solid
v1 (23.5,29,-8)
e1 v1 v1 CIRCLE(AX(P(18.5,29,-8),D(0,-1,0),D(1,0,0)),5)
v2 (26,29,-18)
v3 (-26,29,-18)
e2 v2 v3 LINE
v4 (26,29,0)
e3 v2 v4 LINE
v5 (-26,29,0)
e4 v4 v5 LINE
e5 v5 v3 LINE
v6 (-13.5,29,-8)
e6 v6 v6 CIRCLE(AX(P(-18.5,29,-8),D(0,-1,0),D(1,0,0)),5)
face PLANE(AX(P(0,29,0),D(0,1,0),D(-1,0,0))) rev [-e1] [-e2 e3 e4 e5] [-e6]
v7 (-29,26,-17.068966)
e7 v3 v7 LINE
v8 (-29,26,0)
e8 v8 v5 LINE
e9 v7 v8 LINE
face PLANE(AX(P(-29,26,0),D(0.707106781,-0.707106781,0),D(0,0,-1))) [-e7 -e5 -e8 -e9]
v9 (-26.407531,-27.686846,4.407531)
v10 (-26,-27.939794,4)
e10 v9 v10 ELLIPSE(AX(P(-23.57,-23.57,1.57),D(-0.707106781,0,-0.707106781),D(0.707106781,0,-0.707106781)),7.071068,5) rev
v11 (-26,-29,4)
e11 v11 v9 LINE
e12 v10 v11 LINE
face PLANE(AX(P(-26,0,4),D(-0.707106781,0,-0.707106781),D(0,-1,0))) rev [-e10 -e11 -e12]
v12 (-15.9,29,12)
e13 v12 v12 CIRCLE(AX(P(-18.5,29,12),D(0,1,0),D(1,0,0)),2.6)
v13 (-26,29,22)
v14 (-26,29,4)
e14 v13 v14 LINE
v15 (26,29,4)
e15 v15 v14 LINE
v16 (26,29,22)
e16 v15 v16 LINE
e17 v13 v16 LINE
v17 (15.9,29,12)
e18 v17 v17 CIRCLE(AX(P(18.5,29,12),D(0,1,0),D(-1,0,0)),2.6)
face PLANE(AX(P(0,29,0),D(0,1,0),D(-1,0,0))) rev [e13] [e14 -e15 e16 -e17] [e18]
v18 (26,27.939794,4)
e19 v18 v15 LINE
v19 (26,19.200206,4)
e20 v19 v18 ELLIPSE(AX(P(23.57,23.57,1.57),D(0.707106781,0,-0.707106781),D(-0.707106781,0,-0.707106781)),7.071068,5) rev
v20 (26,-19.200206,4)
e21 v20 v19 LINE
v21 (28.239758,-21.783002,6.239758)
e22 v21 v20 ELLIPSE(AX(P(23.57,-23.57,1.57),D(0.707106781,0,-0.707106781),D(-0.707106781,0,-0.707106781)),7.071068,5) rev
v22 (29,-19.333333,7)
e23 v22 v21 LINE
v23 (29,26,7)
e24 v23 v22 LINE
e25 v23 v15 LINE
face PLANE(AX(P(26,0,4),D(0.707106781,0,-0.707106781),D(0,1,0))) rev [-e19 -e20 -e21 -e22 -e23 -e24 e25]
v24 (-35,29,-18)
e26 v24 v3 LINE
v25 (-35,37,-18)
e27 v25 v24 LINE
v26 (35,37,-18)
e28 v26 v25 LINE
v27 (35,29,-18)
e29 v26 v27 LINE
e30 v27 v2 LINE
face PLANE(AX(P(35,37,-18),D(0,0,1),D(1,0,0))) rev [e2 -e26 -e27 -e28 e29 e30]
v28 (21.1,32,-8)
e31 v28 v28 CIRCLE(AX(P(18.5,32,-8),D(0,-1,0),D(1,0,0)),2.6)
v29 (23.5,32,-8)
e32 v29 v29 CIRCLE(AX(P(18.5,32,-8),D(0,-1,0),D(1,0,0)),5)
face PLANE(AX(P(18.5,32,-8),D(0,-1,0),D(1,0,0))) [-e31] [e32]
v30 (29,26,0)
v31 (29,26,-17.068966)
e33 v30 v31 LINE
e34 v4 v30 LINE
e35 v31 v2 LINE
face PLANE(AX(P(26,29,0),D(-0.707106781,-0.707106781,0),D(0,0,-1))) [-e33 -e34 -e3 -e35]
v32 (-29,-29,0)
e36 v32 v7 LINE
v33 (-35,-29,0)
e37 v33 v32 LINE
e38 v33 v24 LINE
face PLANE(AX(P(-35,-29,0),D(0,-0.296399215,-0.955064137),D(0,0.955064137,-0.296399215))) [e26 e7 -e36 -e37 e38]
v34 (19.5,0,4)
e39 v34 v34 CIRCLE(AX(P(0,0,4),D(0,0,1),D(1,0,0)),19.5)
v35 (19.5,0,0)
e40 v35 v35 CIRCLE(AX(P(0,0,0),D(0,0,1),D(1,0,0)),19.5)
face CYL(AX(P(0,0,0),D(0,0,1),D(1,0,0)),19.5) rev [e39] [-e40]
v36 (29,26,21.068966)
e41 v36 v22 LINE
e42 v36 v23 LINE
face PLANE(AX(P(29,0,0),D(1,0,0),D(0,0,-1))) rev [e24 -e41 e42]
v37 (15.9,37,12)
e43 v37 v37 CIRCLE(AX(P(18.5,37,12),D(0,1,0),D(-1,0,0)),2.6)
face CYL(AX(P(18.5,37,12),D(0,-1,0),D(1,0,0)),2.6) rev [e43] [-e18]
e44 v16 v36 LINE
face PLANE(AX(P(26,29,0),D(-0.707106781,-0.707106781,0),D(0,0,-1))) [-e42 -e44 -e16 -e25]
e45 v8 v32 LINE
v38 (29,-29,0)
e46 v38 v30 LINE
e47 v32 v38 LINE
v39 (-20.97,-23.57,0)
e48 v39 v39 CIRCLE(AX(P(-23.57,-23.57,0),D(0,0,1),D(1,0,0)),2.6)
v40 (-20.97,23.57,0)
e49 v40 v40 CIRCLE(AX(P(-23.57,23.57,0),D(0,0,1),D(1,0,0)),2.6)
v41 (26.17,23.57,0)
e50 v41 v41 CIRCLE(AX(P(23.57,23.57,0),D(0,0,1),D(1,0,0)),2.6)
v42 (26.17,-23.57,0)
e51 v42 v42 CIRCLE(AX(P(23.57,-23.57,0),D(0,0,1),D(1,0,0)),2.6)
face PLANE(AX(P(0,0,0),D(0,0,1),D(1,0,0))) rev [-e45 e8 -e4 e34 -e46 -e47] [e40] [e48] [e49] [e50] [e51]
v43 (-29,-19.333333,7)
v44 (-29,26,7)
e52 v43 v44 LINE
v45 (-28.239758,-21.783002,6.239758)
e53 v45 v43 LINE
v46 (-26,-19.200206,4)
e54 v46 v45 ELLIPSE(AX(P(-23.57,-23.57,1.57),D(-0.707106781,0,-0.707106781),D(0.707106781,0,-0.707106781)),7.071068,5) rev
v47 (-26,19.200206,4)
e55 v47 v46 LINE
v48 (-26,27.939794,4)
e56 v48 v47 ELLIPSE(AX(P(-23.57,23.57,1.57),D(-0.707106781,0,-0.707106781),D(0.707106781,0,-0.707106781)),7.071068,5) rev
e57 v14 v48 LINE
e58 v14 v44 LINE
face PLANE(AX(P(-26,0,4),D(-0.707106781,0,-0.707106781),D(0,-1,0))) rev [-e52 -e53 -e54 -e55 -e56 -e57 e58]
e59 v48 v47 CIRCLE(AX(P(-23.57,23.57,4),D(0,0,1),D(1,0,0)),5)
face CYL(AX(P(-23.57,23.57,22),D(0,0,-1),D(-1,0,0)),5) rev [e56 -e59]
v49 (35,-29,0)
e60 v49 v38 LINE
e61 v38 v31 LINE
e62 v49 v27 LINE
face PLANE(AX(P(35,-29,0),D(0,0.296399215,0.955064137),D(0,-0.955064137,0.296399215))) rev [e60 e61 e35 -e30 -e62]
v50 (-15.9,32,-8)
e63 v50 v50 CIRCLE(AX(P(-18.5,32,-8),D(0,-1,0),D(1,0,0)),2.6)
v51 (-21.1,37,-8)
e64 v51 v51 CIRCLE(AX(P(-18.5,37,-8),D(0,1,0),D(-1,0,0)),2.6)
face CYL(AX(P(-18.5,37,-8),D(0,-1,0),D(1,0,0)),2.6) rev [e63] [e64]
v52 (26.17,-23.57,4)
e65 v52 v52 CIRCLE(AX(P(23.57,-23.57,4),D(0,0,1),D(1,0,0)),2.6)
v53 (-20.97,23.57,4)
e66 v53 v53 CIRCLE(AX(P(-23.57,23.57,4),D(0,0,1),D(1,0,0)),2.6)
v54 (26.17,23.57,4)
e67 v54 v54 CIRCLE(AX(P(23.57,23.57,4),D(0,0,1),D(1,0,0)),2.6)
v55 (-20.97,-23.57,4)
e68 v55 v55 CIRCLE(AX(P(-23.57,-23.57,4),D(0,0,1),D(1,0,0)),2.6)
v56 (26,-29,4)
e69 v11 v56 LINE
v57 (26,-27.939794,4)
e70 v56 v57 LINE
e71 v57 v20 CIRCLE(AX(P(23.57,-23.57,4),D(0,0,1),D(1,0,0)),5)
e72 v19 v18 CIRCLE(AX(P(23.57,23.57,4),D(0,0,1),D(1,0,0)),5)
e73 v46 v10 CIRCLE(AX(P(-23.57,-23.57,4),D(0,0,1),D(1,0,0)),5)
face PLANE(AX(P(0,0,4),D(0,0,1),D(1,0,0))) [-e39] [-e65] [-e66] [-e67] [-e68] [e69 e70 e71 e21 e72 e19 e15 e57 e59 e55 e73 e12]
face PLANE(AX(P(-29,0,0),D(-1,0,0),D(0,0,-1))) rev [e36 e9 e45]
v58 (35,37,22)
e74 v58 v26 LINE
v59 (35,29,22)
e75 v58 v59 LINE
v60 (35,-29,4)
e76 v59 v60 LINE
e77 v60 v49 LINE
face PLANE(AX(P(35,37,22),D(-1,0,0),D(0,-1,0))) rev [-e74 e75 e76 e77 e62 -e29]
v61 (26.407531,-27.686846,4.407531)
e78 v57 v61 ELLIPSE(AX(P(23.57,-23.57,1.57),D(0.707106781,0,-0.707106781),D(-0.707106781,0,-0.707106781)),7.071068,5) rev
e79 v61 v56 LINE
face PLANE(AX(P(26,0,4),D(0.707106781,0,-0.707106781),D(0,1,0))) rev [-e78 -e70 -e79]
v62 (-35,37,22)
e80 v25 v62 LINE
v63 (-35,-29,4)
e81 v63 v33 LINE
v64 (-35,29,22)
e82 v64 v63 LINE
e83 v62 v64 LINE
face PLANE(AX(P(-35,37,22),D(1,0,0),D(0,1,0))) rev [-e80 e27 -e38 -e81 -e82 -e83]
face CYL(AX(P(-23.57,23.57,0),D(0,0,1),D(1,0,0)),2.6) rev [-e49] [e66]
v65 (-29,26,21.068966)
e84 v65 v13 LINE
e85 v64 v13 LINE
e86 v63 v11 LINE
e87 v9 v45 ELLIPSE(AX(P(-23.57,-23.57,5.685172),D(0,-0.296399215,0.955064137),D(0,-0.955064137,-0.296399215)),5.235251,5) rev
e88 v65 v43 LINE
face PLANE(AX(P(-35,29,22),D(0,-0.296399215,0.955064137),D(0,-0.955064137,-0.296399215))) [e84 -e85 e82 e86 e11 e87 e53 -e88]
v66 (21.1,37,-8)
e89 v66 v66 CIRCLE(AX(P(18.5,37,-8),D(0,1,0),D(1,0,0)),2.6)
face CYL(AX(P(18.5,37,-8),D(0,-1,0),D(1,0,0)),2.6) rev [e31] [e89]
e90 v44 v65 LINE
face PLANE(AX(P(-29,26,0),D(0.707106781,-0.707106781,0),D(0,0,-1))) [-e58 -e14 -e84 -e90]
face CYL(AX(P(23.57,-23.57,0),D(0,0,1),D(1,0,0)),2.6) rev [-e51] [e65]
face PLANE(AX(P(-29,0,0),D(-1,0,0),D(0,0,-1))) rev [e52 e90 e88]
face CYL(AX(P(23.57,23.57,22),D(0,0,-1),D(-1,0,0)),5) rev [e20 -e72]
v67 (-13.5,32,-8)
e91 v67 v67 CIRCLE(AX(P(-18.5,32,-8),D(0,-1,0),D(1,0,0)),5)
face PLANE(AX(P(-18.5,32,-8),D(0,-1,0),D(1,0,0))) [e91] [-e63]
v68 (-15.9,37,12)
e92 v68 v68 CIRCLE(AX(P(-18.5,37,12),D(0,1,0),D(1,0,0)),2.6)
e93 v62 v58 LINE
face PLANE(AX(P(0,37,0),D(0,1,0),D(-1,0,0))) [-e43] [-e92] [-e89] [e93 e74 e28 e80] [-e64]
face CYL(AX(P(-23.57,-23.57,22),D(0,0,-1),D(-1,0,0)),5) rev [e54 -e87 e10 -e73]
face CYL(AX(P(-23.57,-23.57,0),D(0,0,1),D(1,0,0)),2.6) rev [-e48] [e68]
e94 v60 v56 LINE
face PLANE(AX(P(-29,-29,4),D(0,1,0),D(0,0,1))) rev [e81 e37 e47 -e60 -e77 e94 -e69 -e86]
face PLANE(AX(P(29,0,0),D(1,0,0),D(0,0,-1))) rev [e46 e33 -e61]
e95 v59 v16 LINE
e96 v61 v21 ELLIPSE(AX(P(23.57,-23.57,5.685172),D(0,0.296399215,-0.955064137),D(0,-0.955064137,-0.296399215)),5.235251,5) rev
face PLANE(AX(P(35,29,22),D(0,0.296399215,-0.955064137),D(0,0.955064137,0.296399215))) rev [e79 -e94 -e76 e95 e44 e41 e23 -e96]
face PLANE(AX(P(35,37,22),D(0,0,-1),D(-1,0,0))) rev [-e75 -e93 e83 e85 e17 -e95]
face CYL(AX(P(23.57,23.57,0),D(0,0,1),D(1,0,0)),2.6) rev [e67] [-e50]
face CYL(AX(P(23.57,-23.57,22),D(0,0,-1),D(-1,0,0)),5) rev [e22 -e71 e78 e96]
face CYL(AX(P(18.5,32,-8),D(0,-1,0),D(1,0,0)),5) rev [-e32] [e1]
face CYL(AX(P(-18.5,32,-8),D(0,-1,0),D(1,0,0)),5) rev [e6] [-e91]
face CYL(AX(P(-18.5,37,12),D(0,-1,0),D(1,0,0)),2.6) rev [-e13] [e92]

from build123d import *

# Parameters (mm, degrees)
SKETCH_1_W          = 58
SKETCH_1_H          = 58
EXTRUDE_1_DEPTH     = 4
SKETCH_6_R          = 19.5
SKETCH_6_R_2        = 2.6
CUT_EXTRUDE_1_DEPTH = 42.206795556
SKETCH_3_W          = 70
SKETCH_3_H          = 40
EXTRUDE_2_DEPTH     = 8
EXTRUDE_3_DEPTH     = 6
SKETCH_8_R          = 2.6
CUT_EXTRUDE_2_DEPTH = 72.224995612
SKETCH_9_R          = 5
CUT_EXTRUDE_3_DEPTH = 3
CHAMFER_2_SIZE      = 3
CHAMFER_1_SIZE      = 3
SKETCH_11_R         = 5
CUT_EXTRUDE_4_DEPTH = 56.479726027


with BuildPart() as part:
    # Эскиз1 → Бобышка-Вытянуть1 (new body)
    with BuildSketch(Plane.XY):
        Rectangle(SKETCH_1_W, SKETCH_1_H)
    extrude(amount=EXTRUDE_1_DEPTH)

    # Эскиз6 → Вырез-Вытянуть1 (cut, through all)
    with BuildSketch(Plane.XY.offset(4)):
        Circle(SKETCH_6_R)
        with Locations((-23.57, 23.57)):
            Circle(SKETCH_6_R_2)
        with Locations((23.57, 23.57)):
            Circle(SKETCH_6_R_2)
        with Locations((-23.57, -23.57)):
            Circle(SKETCH_6_R_2)
        with Locations((23.57, -23.57)):
            Circle(SKETCH_6_R_2)
    extrude(amount=-CUT_EXTRUDE_1_DEPTH, mode=Mode.SUBTRACT)

    # Эскиз3 → Бобышка-Вытянуть2 (add)
    with BuildSketch(Plane(origin=(0, 29, 0), x_dir=(1, 0, 0), z_dir=(0, 1, 0))):
        with Locations((0, -2)):
            Rectangle(SKETCH_3_W, SKETCH_3_H)
    extrude(amount=EXTRUDE_2_DEPTH)

    # Эскиз5 → Бобышка-Вытянуть3 (add)
    with BuildSketch(Plane(origin=(29, 0, 0), x_dir=(0, 0, -1), z_dir=(1, 0, 0))):
        Polygon((-4, -29), (0, -29), (18, 29), (-22, 29), align=None)
    extrude_3 = extrude(amount=EXTRUDE_3_DEPTH)

    # Зеркальное отражение3: Бобышка-Вытянуть3 across plane
    add(extrude_3.mirror(Plane(origin=(0, 0, 0), x_dir=(0, 0, 1), z_dir=(1, 0, 0))))

    # Эскиз8 → Вырез-Вытянуть2 (cut, through all)
    with BuildSketch(Plane(origin=(0, 29, 0), x_dir=(1, 0, 0), z_dir=(0, 1, 0))):
        with Locations((18.5, 8)):
            Circle(SKETCH_8_R)
        with Locations(Location((-18.5, 8, 0), (0, 0, 180))):
            Circle(SKETCH_8_R)
        with Locations(Location((18.5, -12, 0), (0, 0, 180))):
            Circle(SKETCH_8_R)
        with Locations((-18.5, -12)):
            Circle(SKETCH_8_R)
    extrude(amount=CUT_EXTRUDE_2_DEPTH, mode=Mode.SUBTRACT)

    # Эскиз9 → Вырез-Вытянуть3 (cut)
    with BuildSketch(Plane.XZ.offset(-29)):
        with Locations((-18.5, -8)):
            Circle(SKETCH_9_R)
        with Locations((18.5, -8)):
            Circle(SKETCH_9_R)
    extrude(amount=-CUT_EXTRUDE_3_DEPTH, mode=Mode.SUBTRACT)

    # Фаска2
    # the kernel refuses this chamfer: 3 mm, written as the material it adds along each edge
    with BuildSketch(Plane(origin=(29, -29, 4), x_dir=(0.027495876610586775, 0, 0.9996219169112968), z_dir=(0, 1, 0))) as chamfer_2_piece_1_section:
        Polygon((CHAMFER_2_SIZE * 0.999621916911, -CHAMFER_2_SIZE * 0.0274958766106), (-CHAMFER_2_SIZE * 0.0274958766106, -CHAMFER_2_SIZE * 0.999621916911), (0, 0), align=None)
    chamfer_2_piece_1 = extrude(amount=65.715048964, mode=Mode.PRIVATE)
    chamfer_2_piece_1 = split(chamfer_2_piece_1, bisect_by=Plane(origin=(27.993637715, -0.868614474, 12.730429991), z_dir=(0, 0.2963992148724529, -0.9550641368112371)), keep=Keep.TOP, mode=Mode.PRIVATE)
    chamfer_2_piece_1 = chamfer_2_piece_1 - Plane(origin=(23.57, -23.57, 4.956337432), x_dir=(1, 0, 0), z_dir=(0, 0, 1)) * Cylinder(2.6, 144, mode=Mode.PRIVATE)
    chamfer_2_piece_1 = chamfer_2_piece_1 - Plane(origin=(23.57, 23.57, 4.956337432), x_dir=(1, 0, 0), z_dir=(0, 0, 1)) * Cylinder(2.6, 144, mode=Mode.PRIVATE)
    add(chamfer_2_piece_1)
    with BuildSketch(Plane(origin=(-29, 36.715048964, 4), x_dir=(0.9996219169112968, 0, -0.027495876610586334), z_dir=(0, -1, 0))) as chamfer_2_piece_2_section:
        Polygon((CHAMFER_2_SIZE * 0.999621916911, CHAMFER_2_SIZE * 0.0274958766106), (-CHAMFER_2_SIZE * 0.0274958766106, CHAMFER_2_SIZE * 0.999621916911), (0, 0), align=None)
    chamfer_2_piece_2 = extrude(amount=65.715048964, mode=Mode.PRIVATE)
    chamfer_2_piece_2 = split(chamfer_2_piece_2, bisect_by=Plane(origin=(-28.01061912, 27.703260845, 21.597563711), z_dir=(0, 0.2963992148724529, -0.9550641368112371)), keep=Keep.TOP, mode=Mode.PRIVATE)
    chamfer_2_piece_2 = chamfer_2_piece_2 - Plane(origin=(-23.57, -23.57, 4.98938088), x_dir=(1, 0, 0), z_dir=(0, 0, 1)) * Cylinder(2.6, 144, mode=Mode.PRIVATE)
    chamfer_2_piece_2 = chamfer_2_piece_2 - Plane(origin=(-23.57, 23.57, 4.98938088), x_dir=(1, 0, 0), z_dir=(0, 0, 1)) * Cylinder(2.6, 144, mode=Mode.PRIVATE)
    add(chamfer_2_piece_2)

    # Фаска1
    chamfer_1_edges = [part.edges().sort_by_distance(p)[0] for p in [
        (-29, 29, 14.5),
        (29, 29, 14.5),
        (29, 29, -9),
        (-29, 29, -9),
    ]]
    chamfer(chamfer_1_edges, length=CHAMFER_1_SIZE)

    # Эскиз11 → Вырез-Вытянуть4 (cut, through all)
    with BuildSketch(Plane.XY.offset(4)):
        with Locations((-23.57, 23.57)):
            Circle(SKETCH_11_R)
        with Locations((23.57, 23.57)):
            Circle(SKETCH_11_R)
        with Locations((23.57, -23.57)):
            Circle(SKETCH_11_R)
        with Locations((-23.57, -23.57)):
            Circle(SKETCH_11_R)
    extrude(amount=CUT_EXTRUDE_4_DEPTH, mode=Mode.SUBTRACT)


solid = part.part
